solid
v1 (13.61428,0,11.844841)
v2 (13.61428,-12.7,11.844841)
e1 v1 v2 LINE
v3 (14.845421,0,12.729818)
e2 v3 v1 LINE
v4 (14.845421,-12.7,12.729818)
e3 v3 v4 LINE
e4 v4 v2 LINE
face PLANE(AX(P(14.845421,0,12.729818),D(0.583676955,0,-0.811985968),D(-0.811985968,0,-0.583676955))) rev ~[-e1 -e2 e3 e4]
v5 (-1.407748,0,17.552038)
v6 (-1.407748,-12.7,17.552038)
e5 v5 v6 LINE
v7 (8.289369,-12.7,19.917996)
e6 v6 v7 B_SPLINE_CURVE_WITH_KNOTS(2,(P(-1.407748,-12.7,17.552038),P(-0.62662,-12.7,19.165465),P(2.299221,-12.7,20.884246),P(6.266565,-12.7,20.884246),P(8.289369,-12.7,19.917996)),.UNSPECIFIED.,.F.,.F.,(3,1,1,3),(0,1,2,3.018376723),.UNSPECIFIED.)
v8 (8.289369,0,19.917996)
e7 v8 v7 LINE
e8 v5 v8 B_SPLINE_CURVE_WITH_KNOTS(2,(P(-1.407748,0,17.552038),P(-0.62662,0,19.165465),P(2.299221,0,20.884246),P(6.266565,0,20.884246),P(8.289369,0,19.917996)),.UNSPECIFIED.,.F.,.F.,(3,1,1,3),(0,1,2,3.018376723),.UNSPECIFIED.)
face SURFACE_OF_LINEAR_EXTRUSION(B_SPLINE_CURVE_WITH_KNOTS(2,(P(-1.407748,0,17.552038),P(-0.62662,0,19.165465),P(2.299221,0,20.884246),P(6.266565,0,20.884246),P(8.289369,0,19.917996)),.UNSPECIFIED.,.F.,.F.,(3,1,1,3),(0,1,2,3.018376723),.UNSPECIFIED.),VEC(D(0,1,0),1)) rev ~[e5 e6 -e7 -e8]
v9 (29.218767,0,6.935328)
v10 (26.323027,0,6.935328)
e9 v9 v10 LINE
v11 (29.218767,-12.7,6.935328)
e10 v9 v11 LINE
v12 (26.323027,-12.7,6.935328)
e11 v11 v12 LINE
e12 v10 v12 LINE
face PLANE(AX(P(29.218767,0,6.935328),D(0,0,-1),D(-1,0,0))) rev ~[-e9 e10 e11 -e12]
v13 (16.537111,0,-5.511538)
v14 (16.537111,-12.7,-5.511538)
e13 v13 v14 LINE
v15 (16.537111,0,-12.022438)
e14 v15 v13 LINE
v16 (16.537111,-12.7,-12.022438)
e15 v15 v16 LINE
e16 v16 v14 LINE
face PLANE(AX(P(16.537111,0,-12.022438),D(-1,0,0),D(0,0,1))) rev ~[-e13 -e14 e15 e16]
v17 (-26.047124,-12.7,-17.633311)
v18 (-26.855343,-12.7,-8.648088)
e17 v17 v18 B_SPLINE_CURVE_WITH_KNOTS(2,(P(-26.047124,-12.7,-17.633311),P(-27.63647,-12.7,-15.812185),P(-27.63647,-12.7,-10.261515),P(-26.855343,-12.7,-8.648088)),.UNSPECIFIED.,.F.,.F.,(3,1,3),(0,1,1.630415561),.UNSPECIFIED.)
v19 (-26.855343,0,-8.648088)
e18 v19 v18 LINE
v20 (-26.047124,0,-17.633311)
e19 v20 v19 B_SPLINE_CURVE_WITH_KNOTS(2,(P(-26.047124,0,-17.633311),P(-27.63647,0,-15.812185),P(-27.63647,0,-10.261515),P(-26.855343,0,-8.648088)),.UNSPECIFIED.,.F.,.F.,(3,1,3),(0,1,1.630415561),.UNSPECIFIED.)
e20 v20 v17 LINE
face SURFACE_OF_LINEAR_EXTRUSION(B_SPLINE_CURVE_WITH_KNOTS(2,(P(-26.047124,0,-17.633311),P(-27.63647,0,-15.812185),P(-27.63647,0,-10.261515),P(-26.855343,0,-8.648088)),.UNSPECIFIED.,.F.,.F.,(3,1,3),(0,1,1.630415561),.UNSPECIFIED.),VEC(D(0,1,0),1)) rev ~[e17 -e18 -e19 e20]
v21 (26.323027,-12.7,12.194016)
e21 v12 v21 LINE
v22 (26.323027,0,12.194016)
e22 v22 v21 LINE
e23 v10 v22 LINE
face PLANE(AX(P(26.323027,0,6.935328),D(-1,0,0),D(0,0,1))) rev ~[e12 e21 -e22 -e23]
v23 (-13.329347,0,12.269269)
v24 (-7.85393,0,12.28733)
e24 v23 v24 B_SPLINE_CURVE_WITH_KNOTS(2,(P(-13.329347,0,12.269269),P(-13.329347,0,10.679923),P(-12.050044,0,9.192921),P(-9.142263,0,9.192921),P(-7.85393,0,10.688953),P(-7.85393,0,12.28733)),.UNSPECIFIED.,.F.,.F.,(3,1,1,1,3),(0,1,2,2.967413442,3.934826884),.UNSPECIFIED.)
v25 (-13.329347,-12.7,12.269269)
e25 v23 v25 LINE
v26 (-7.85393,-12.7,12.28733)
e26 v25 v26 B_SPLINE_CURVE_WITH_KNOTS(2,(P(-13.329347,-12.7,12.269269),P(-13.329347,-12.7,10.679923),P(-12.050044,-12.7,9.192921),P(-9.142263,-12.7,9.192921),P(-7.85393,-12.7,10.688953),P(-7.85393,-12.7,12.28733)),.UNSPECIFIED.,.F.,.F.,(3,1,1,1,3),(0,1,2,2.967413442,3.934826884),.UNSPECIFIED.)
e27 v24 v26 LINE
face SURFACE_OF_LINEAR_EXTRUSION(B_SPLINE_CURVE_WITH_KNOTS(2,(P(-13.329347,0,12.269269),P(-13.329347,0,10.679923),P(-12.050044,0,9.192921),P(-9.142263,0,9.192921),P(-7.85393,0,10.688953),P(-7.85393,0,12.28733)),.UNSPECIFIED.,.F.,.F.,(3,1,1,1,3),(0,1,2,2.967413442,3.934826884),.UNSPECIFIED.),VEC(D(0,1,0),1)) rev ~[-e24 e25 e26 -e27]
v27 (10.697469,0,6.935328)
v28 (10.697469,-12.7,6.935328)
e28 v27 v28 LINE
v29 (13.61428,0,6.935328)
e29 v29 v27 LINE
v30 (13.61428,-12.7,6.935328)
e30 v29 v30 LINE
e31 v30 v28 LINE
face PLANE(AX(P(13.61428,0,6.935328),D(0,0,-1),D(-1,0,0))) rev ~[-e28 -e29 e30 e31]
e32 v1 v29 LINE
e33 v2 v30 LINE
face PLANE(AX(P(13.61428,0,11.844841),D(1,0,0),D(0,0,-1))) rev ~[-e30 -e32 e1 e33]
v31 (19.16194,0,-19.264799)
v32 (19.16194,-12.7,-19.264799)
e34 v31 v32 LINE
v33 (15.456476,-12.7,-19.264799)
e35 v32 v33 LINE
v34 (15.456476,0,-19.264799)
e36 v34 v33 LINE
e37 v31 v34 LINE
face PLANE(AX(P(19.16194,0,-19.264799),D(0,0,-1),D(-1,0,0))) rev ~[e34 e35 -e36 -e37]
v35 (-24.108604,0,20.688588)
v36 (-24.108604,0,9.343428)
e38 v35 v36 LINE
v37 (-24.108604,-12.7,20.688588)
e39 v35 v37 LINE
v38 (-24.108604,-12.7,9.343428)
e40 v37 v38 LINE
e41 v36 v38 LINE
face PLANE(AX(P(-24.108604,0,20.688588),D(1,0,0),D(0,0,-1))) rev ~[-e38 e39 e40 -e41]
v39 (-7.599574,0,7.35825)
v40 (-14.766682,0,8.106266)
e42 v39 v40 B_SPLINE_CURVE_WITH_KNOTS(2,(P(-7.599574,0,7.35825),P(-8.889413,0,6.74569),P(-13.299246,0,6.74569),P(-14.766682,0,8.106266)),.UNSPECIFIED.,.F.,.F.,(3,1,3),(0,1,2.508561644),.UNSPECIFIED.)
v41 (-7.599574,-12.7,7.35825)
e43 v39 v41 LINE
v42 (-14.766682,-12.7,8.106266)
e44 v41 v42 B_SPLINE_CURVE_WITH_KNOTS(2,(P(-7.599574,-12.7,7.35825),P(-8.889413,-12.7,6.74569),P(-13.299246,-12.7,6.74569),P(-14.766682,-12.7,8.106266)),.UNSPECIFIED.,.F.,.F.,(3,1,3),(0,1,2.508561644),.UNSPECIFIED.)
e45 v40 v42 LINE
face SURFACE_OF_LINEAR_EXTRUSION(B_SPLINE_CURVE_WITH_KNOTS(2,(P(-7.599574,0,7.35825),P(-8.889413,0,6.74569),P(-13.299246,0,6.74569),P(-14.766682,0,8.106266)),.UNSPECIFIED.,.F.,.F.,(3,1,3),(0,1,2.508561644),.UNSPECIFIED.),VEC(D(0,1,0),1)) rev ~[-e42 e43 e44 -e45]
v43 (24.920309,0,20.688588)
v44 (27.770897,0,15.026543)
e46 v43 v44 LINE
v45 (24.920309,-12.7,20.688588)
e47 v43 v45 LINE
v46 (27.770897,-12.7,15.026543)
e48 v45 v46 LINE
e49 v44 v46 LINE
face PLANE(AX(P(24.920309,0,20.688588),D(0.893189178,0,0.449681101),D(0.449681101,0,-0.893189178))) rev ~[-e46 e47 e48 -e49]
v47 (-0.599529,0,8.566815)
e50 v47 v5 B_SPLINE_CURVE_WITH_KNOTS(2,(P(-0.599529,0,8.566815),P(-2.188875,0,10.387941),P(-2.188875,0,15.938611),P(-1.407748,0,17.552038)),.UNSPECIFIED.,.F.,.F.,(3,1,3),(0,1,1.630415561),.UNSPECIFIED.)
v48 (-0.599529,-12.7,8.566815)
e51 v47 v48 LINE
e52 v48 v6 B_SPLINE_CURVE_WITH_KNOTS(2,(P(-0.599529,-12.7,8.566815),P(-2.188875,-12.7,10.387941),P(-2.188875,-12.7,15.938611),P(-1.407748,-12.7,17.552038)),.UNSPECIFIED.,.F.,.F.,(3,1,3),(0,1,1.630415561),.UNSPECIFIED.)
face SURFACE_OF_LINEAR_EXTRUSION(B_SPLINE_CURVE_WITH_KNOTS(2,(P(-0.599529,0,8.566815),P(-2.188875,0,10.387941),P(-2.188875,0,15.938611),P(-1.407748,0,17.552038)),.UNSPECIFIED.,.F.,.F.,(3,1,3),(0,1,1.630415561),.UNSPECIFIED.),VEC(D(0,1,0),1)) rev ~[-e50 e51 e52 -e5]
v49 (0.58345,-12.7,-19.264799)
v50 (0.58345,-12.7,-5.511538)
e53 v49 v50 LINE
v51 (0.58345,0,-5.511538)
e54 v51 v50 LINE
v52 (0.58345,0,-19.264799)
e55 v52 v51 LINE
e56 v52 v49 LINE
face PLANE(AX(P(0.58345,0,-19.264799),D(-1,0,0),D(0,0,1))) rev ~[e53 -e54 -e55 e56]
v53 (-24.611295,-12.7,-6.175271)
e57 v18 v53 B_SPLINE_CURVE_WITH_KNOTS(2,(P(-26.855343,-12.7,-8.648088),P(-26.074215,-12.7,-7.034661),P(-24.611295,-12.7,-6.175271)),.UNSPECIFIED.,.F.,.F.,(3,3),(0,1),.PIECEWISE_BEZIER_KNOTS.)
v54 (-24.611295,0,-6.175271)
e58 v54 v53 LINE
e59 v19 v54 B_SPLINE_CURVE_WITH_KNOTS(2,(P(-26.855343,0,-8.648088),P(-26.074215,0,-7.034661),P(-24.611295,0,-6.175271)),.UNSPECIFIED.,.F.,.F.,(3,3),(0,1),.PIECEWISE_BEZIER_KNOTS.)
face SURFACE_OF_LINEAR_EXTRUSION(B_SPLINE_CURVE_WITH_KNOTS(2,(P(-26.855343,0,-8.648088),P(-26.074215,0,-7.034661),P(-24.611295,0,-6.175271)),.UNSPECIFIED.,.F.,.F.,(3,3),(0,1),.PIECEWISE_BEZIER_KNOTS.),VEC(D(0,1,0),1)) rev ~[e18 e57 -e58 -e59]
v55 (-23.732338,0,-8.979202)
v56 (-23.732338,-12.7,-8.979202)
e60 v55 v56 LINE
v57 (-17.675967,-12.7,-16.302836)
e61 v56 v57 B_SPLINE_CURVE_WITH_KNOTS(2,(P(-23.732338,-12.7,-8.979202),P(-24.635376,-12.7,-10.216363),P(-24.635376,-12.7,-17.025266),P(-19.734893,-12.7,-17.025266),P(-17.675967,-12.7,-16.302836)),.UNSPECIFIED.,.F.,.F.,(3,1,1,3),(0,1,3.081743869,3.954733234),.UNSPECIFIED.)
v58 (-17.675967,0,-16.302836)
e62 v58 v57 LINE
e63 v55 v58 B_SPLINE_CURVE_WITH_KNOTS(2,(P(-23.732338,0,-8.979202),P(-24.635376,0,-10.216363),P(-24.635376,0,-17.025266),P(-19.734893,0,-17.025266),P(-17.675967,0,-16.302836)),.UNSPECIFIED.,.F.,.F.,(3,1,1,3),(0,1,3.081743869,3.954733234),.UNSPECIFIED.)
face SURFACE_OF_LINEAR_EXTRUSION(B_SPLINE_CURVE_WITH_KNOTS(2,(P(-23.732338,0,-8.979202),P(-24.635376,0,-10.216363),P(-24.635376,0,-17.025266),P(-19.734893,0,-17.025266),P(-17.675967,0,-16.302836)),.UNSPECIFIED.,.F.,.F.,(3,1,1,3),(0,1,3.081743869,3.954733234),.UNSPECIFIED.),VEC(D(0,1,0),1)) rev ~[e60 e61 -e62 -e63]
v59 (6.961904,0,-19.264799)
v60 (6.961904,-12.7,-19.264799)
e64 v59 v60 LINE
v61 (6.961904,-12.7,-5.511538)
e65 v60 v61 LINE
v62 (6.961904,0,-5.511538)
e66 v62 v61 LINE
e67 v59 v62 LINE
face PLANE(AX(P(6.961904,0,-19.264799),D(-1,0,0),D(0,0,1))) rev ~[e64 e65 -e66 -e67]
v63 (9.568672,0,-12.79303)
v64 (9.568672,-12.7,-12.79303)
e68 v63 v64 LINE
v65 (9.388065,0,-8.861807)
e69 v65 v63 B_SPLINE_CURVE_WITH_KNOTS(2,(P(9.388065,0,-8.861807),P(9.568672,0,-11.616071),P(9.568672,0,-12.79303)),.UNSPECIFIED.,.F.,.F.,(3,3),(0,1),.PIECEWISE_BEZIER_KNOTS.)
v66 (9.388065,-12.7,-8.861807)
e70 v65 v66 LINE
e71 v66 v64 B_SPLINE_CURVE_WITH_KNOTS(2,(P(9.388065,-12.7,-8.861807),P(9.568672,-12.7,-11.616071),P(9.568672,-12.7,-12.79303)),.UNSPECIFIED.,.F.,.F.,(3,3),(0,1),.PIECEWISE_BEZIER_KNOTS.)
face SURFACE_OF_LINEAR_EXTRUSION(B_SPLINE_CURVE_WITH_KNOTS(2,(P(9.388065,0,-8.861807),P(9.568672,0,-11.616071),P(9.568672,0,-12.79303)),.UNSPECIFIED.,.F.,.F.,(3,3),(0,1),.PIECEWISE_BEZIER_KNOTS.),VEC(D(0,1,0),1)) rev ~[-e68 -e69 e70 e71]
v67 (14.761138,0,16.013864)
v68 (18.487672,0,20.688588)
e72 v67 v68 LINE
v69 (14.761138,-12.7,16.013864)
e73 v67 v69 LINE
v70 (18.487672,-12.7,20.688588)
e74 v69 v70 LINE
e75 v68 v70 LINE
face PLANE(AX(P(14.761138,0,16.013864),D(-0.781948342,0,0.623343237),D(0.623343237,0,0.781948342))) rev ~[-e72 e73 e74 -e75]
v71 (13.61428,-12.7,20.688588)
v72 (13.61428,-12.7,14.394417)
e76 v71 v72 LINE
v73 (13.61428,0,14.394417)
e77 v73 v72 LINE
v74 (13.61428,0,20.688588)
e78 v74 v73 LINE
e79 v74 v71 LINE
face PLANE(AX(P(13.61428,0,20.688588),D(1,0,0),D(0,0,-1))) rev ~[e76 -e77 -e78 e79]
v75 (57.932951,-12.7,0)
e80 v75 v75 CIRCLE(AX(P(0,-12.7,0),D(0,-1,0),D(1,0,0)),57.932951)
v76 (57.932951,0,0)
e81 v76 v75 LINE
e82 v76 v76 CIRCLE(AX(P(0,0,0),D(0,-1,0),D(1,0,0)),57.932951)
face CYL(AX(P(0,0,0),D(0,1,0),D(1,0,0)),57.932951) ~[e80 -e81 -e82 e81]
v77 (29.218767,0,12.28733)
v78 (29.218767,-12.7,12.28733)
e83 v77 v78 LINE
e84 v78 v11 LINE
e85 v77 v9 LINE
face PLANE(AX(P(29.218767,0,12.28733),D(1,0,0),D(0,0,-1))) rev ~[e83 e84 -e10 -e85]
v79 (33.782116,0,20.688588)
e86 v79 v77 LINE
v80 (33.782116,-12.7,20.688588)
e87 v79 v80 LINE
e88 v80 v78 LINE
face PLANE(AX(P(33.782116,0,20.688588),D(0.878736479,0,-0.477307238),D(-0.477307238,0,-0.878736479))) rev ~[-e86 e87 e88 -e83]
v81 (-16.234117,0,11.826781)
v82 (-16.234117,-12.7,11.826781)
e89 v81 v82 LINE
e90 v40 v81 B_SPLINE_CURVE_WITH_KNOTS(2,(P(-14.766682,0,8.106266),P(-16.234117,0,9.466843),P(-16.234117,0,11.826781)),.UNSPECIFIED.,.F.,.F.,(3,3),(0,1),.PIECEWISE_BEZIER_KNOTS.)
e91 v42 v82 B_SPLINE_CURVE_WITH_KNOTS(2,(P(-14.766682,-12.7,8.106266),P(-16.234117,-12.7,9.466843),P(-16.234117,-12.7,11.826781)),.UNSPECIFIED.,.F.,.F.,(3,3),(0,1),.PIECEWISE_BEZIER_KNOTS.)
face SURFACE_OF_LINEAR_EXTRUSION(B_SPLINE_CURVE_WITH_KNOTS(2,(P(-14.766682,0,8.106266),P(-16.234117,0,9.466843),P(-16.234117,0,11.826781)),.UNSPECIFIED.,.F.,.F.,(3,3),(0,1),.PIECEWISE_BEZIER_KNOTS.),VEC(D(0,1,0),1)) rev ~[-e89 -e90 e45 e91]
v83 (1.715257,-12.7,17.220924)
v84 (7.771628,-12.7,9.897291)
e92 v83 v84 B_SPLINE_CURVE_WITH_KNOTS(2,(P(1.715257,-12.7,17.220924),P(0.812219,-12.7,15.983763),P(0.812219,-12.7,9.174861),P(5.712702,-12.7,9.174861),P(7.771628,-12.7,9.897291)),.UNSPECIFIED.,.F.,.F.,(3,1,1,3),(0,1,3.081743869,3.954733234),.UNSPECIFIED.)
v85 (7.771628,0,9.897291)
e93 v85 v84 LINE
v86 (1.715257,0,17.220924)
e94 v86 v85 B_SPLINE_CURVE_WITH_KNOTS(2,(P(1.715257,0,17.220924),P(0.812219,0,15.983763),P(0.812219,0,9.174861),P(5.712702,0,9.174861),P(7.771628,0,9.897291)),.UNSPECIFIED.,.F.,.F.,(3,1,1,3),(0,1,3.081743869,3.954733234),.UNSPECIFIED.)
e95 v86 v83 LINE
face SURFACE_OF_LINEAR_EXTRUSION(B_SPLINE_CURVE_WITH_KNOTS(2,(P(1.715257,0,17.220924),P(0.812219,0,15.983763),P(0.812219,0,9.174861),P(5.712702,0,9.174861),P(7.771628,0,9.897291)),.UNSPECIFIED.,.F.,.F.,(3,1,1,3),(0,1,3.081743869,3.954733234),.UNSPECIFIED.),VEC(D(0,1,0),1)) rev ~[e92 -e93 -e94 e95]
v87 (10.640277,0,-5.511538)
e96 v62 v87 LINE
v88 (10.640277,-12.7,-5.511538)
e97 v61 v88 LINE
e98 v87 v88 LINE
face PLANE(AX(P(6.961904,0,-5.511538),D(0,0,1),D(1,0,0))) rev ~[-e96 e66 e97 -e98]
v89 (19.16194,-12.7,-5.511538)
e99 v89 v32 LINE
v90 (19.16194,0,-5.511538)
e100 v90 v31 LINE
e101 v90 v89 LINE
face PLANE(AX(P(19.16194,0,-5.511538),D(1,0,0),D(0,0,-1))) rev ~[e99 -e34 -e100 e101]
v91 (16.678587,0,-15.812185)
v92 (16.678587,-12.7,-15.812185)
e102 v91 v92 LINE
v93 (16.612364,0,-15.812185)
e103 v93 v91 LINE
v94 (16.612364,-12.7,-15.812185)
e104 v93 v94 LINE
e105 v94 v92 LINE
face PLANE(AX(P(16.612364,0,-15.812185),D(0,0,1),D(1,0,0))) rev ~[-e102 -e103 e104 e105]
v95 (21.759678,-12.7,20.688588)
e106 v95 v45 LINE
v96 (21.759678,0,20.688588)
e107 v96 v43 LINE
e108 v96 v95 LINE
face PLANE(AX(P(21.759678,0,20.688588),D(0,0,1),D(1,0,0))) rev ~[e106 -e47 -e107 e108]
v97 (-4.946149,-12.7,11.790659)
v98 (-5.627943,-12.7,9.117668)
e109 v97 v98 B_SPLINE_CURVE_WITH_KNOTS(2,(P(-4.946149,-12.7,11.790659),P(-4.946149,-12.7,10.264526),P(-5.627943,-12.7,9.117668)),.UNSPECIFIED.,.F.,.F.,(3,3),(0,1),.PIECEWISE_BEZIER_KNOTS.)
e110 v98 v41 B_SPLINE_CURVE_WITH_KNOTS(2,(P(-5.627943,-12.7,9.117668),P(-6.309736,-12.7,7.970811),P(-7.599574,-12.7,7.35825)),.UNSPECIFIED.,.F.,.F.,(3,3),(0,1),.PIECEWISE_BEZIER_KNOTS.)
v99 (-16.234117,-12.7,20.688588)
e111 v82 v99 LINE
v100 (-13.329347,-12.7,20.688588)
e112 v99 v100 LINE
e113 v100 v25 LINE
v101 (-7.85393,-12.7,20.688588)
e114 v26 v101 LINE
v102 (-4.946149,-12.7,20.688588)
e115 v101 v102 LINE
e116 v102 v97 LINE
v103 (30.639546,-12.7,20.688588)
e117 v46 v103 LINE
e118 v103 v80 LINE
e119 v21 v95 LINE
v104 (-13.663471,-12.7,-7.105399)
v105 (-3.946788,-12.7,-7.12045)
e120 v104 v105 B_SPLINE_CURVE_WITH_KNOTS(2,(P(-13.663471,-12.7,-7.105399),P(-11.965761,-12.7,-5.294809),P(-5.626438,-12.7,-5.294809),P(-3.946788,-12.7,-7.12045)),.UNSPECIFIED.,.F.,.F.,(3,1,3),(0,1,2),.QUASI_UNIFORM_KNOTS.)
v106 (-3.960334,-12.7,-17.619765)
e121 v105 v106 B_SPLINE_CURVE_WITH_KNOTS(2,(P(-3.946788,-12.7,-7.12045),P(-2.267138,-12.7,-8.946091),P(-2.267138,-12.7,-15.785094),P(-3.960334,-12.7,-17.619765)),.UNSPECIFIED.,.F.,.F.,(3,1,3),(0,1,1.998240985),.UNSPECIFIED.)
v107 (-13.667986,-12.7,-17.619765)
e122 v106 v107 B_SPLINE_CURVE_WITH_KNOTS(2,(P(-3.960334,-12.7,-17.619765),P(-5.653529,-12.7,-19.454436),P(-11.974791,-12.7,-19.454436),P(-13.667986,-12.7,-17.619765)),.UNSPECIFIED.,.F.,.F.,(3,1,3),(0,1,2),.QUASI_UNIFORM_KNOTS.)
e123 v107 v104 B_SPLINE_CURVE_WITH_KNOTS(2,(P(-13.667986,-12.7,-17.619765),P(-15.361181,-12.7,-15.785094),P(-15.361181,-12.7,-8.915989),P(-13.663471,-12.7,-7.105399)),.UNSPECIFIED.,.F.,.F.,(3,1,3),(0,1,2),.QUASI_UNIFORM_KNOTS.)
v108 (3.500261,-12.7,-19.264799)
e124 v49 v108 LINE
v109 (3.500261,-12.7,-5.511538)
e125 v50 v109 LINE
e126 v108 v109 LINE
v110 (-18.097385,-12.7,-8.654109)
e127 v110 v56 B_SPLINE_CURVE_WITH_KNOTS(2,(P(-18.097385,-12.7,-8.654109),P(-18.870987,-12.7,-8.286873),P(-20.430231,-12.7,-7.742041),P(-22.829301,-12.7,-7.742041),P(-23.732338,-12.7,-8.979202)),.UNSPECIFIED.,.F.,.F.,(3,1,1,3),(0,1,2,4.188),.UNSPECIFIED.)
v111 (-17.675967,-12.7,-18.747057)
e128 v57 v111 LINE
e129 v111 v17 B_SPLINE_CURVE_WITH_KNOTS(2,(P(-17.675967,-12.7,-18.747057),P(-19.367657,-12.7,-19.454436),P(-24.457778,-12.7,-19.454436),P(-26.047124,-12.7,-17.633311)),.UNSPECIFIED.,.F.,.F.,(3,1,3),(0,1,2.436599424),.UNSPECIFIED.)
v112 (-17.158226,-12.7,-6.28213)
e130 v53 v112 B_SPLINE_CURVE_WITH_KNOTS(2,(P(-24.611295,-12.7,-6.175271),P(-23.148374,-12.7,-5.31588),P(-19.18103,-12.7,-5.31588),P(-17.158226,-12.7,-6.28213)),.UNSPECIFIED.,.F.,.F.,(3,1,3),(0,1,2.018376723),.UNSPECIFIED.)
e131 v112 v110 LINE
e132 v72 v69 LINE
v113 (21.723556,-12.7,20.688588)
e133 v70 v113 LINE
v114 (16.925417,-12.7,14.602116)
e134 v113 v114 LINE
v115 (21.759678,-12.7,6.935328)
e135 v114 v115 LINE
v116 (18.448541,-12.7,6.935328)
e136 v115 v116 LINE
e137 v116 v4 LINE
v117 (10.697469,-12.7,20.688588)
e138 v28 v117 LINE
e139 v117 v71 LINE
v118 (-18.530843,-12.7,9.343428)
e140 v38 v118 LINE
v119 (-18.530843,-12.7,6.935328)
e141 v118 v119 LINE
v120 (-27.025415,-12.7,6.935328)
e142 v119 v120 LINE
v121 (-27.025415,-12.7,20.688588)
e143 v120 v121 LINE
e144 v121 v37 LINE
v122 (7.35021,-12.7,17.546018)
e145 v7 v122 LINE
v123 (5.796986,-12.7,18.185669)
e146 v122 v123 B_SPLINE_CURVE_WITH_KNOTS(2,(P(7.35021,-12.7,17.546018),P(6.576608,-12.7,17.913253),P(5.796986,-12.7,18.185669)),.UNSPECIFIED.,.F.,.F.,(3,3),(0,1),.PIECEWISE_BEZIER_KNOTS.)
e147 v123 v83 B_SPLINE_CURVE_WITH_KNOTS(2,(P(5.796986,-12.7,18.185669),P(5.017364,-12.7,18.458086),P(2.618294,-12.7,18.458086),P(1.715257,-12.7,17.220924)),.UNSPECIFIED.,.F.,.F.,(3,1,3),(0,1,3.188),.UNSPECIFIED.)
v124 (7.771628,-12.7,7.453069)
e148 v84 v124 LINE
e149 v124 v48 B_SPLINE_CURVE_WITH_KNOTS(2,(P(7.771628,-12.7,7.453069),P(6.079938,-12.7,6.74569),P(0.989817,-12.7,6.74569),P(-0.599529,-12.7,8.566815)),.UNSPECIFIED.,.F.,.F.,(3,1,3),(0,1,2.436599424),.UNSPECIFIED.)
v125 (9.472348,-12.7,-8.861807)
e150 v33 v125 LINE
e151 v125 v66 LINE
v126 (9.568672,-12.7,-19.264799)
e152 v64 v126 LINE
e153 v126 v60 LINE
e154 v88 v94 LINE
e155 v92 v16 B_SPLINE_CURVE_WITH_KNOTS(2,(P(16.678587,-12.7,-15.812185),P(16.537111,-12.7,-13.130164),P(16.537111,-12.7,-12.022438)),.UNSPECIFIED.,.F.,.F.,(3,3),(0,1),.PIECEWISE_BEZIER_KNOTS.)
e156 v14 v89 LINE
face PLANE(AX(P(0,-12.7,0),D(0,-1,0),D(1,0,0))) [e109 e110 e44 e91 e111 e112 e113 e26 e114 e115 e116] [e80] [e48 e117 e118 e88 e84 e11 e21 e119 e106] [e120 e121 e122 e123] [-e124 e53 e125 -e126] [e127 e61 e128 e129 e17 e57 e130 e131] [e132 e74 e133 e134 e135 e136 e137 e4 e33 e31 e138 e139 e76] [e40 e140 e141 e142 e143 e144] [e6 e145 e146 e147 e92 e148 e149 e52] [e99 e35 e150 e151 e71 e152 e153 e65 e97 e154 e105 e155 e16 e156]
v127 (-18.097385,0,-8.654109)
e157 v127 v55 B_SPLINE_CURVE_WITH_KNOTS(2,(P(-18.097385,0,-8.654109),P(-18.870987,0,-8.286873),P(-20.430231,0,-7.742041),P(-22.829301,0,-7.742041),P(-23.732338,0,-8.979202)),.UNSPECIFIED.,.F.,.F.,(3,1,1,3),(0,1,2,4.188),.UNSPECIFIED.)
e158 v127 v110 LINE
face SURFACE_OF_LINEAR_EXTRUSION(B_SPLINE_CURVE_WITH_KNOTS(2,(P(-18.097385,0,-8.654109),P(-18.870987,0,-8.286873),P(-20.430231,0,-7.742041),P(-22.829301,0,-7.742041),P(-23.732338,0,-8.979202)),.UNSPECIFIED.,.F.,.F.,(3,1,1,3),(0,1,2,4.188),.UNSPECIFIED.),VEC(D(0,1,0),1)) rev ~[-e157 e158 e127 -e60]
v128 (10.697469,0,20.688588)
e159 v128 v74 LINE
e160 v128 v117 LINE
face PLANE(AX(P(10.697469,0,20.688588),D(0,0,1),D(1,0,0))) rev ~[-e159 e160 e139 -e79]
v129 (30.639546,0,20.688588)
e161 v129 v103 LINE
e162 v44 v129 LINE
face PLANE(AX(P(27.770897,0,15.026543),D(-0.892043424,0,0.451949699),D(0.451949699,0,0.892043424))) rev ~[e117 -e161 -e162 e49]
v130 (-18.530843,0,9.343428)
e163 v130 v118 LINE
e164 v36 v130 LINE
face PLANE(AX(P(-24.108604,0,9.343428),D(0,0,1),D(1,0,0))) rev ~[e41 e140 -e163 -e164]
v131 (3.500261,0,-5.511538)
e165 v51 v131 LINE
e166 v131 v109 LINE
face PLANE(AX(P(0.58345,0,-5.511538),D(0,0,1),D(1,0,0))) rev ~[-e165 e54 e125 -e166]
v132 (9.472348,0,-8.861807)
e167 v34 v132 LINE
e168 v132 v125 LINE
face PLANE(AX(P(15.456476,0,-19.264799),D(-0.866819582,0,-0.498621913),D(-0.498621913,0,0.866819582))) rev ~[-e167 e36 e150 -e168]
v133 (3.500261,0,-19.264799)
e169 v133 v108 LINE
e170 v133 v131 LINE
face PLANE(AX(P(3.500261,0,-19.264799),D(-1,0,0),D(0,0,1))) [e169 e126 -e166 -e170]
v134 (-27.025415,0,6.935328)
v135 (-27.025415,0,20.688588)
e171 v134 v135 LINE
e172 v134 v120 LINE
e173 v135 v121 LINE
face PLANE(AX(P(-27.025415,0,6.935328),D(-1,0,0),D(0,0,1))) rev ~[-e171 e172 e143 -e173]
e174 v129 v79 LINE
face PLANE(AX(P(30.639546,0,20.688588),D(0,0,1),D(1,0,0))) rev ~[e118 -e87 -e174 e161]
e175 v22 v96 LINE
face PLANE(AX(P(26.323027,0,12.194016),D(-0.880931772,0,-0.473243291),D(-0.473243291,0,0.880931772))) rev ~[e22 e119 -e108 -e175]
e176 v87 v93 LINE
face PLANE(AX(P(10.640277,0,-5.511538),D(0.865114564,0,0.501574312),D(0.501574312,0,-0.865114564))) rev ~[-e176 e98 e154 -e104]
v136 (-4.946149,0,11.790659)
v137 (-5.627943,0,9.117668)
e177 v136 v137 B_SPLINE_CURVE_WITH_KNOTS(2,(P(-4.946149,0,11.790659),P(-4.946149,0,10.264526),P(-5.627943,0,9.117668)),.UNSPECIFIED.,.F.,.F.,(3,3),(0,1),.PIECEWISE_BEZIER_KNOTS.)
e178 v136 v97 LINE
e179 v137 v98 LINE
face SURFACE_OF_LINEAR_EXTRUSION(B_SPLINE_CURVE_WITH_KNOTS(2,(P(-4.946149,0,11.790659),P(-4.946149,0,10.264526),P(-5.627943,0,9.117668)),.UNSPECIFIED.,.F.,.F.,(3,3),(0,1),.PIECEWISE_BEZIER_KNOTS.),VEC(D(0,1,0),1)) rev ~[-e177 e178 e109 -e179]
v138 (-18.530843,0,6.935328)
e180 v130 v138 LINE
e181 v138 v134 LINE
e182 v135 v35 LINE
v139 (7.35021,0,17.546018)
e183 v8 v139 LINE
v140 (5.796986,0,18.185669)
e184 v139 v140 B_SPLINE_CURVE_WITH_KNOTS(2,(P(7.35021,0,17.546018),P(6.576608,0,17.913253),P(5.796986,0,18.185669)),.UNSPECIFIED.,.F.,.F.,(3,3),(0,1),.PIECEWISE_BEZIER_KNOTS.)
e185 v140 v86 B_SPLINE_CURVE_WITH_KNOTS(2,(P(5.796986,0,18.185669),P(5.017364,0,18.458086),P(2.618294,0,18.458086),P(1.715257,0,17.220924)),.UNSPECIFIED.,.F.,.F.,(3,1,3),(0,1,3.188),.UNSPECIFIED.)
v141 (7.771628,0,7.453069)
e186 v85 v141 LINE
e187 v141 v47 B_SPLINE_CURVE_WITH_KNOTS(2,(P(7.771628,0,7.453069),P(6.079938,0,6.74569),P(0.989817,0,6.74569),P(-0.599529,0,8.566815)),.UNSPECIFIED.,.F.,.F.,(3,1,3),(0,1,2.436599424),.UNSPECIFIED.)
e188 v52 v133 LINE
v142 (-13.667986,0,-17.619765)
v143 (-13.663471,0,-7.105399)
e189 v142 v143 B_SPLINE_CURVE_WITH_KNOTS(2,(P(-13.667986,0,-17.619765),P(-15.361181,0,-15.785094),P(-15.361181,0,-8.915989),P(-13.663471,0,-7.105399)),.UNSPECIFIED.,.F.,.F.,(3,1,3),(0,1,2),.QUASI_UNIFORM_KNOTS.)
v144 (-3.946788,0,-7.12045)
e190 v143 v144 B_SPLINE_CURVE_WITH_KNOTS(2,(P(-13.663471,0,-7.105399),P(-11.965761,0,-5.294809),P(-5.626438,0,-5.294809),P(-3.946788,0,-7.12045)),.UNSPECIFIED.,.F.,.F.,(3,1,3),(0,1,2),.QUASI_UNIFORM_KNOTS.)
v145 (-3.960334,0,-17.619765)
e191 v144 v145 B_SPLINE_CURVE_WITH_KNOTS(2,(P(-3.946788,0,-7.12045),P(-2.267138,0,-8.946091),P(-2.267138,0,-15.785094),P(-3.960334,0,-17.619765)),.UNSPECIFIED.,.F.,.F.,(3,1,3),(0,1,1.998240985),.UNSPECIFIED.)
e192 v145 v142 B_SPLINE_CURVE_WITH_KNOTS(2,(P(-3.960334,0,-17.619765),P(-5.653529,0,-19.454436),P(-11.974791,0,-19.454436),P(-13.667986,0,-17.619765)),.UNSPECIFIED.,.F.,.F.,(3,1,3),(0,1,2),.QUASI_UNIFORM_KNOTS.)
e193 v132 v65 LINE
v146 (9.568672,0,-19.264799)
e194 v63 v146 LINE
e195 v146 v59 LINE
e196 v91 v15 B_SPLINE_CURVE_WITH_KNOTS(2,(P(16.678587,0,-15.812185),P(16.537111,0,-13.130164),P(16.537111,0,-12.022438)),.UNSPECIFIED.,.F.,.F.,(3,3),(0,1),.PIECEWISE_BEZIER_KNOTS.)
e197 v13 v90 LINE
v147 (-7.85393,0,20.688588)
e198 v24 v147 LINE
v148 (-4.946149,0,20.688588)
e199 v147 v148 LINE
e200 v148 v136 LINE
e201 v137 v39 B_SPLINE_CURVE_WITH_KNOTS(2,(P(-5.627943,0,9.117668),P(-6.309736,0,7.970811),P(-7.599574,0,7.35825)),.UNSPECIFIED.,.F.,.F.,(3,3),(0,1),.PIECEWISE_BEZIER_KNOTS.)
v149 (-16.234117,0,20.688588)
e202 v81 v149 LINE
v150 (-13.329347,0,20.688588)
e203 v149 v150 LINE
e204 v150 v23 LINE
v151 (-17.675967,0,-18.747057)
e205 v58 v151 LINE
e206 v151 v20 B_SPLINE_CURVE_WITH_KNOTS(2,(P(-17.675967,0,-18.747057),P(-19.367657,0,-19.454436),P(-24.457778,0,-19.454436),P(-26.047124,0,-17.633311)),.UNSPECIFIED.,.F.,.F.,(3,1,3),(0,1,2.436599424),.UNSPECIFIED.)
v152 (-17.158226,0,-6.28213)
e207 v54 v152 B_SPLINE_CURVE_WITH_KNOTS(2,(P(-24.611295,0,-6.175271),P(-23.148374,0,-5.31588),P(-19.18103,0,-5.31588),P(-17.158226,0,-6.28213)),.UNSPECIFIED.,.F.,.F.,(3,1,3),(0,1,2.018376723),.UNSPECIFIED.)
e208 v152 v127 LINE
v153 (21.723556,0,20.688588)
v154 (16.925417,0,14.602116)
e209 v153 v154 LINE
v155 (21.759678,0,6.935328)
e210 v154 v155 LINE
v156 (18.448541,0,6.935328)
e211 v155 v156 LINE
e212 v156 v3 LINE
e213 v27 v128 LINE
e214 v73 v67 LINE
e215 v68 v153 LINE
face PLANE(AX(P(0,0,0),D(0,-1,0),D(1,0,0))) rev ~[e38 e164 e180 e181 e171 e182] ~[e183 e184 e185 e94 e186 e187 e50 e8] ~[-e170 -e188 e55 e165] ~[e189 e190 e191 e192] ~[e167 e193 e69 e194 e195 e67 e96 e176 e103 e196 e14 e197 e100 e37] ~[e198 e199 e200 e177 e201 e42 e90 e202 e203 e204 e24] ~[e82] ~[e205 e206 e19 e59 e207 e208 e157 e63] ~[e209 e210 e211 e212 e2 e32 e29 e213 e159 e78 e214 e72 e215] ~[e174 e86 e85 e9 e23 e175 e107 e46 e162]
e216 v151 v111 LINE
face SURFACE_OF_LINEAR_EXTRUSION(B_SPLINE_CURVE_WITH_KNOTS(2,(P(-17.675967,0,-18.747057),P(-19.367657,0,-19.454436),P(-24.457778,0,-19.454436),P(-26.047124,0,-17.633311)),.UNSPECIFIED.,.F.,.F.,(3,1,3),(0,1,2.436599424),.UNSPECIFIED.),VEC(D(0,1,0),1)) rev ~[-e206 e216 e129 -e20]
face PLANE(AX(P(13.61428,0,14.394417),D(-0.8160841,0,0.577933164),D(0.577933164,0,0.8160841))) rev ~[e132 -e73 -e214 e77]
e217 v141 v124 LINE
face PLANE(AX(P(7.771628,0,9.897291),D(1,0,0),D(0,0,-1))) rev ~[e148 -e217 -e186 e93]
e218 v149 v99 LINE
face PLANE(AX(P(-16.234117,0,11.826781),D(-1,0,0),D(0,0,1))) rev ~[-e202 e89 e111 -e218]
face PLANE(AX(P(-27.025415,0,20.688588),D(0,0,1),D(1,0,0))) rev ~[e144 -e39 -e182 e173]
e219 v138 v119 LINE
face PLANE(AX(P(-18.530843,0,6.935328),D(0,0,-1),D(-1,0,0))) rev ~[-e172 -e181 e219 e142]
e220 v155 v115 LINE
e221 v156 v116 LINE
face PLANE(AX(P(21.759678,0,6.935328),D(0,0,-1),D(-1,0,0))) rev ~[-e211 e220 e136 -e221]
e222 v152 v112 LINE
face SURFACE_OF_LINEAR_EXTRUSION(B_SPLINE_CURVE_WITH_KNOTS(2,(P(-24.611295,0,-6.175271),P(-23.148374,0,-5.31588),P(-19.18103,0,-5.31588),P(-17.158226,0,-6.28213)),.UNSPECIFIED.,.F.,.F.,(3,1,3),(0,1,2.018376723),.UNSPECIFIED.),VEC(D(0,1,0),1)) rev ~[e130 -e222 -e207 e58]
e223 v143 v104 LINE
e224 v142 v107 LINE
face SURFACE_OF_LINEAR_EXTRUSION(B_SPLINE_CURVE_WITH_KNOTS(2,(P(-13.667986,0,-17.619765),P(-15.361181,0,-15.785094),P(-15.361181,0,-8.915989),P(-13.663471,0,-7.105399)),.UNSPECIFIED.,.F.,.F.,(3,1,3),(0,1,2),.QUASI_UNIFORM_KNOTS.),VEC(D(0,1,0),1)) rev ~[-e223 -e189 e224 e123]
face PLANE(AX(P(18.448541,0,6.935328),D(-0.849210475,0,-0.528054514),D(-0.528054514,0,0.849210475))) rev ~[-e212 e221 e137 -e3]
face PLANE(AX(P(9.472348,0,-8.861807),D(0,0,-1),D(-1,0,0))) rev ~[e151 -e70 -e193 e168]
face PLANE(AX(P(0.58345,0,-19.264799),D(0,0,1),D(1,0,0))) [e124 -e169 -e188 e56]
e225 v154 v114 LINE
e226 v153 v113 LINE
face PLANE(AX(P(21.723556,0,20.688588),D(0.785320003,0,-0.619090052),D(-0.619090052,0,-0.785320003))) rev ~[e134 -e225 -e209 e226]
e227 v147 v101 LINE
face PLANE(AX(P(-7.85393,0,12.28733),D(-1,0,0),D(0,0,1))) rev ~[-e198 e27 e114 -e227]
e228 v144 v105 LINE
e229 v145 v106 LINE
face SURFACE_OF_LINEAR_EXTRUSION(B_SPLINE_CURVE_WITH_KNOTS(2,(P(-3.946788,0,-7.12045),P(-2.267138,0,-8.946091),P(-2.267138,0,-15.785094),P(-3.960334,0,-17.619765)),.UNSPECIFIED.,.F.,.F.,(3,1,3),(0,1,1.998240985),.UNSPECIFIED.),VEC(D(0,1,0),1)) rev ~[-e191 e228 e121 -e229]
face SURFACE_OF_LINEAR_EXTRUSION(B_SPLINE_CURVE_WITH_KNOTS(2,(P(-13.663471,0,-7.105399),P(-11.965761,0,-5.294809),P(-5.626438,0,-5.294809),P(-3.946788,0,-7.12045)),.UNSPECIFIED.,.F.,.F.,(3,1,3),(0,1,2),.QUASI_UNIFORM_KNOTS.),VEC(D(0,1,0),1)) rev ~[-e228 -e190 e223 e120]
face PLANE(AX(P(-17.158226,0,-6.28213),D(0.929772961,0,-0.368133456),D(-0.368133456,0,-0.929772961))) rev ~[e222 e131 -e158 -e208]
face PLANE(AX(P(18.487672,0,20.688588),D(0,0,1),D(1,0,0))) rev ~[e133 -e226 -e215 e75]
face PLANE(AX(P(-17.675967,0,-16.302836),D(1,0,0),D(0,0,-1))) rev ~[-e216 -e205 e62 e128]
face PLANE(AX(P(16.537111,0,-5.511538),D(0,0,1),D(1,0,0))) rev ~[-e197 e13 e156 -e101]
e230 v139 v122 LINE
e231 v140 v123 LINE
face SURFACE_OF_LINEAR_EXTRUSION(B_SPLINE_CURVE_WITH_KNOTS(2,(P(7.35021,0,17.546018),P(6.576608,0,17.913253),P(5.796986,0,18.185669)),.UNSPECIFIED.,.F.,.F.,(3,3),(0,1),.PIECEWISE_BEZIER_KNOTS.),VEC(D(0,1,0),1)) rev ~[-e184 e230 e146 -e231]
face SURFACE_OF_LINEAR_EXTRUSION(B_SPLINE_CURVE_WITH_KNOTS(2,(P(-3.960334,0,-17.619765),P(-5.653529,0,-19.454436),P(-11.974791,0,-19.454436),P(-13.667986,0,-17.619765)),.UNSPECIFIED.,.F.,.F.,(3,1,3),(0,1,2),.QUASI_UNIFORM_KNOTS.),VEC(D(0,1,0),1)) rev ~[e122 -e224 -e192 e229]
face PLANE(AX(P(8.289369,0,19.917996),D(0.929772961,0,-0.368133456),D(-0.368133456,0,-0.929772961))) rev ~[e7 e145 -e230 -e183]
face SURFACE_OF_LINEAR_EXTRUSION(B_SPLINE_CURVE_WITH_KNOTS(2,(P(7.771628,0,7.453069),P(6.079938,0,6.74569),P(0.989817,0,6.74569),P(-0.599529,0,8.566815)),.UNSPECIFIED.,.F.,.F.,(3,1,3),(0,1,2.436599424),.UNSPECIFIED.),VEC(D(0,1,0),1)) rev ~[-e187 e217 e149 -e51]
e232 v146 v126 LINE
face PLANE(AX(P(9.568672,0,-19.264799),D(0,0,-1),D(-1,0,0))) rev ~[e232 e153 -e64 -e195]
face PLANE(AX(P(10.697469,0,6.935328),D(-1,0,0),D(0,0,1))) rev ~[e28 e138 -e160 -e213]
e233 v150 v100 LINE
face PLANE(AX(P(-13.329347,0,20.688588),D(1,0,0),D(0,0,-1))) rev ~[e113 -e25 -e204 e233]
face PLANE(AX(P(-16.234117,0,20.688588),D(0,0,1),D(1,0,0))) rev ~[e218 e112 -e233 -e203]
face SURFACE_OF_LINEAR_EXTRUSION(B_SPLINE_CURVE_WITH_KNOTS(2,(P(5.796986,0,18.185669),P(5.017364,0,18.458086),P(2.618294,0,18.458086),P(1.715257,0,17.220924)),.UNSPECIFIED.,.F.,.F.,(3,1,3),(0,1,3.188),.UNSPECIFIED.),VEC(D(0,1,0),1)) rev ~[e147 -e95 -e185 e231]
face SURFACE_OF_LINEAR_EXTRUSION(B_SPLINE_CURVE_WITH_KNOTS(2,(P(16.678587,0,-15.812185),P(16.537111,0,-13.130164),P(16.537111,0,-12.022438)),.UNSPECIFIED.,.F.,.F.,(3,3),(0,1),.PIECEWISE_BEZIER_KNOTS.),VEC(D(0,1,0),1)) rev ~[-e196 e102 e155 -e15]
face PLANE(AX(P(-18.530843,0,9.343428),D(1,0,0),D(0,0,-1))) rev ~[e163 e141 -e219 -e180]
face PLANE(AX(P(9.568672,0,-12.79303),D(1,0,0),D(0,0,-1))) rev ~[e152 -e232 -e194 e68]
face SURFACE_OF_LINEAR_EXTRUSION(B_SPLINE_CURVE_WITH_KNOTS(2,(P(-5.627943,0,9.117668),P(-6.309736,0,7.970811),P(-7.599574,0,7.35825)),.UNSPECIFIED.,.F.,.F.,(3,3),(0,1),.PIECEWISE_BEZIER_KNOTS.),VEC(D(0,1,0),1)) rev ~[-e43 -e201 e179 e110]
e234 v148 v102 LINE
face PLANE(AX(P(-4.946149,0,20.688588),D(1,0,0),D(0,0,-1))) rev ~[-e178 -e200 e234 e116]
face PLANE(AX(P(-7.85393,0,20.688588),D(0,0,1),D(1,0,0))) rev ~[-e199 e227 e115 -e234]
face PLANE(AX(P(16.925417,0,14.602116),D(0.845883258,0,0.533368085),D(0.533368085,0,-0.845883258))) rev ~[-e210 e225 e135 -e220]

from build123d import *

# Parameters (mm, degrees)
F0_R     = 57.932951026
F0_W     = 2.9168109343
F0_H     = 13.753260226
F1_DEPTH = 12.7


with BuildPart() as f1:
    # F0 (on Front) → F1 (new body)
    with BuildSketch(Plane.XZ):
        Circle(F0_R)
        with BuildLine():
            add(Edge.make_bspline(
                [(-19.6506091277, -8.0144570558), (-20.4302314517, -7.7420407611), (-21.1827626525, -7.7420407611)],
                knots=[0, 0, 0, 1, 1, 1], degree=2))
            add(Edge.make_bspline(
                [(-21.1827626525, -7.7420407611), (-22.8293009199, -7.7420407611), (-23.7323383609, -8.9792020552)],
                knots=[0, 0, 0, 1, 1, 1], degree=2))
            add(Edge.make_bspline(
                [(-23.7323383609, -8.9792020552), (-24.6353758019, -10.2163633494), (-24.6353758019, -12.425794955)],
                knots=[0, 0, 0, 1, 1, 1], degree=2))
            add(Edge.make_bspline(
                [(-24.6353758019, -12.425794955), (-24.6353758019, -17.0252656543), (-21.1827626525, -17.0252656543)],
                knots=[0, 0, 0, 1, 1, 1], degree=2))
            add(Edge.make_bspline(
                [(-21.1827626525, -17.0252656543), (-19.7348926222, -17.0252656543), (-17.6759672568, -16.3028357015)],
                knots=[0, 0, 0, 1, 1, 1], degree=2))
            Line((-17.6759672568, -16.3028357015), (-17.6759672568, -18.7470570418))
            add(Edge.make_bspline(
                [(-17.6759672568, -18.7470570418), (-19.3676573962, -19.4544363705), (-21.4566840096, -19.4544363705)],
                knots=[0, 0, 0, 1, 1, 1], degree=2))
            add(Edge.make_bspline(
                [(-21.4566840096, -19.4544363705), (-24.4577784385, -19.4544363705), (-26.0471243346, -17.6333108646)],
                knots=[0, 0, 0, 1, 1, 1], degree=2))
            add(Edge.make_bspline(
                [(-26.0471243346, -17.6333108646), (-27.6364702307, -15.8121853586), (-27.6364702307, -12.4077342061)],
                knots=[0, 0, 0, 1, 1, 1], degree=2))
            add(Edge.make_bspline(
                [(-27.6364702307, -12.4077342061), (-27.6364702307, -10.2615152214), (-26.8553428443, -8.6480883269)],
                knots=[0, 0, 0, 1, 1, 1], degree=2))
            add(Edge.make_bspline(
                [(-26.8553428443, -8.6480883269), (-26.0742154578, -7.0346614323), (-24.6112948034, -6.175270801)],
                knots=[0, 0, 0, 1, 1, 1], degree=2))
            add(Edge.make_bspline(
                [(-24.6112948034, -6.175270801), (-23.1483741491, -5.3158801697), (-21.1827626525, -5.3158801697)],
                knots=[0, 0, 0, 1, 1, 1], degree=2))
            add(Edge.make_bspline(
                [(-21.1827626525, -5.3158801697), (-19.1810296584, -5.3158801697), (-17.1582257906, -6.2821302315)],
                knots=[0, 0, 0, 1, 1, 1], degree=2))
            Line((-17.1582257906, -6.2821302315), (-18.0973847292, -8.6541085765))
            add(Edge.make_bspline(
                [(-18.0973847292, -8.6541085765), (-18.8709868037, -8.2868733505), (-19.6506091277, -8.0144570558)],
                knots=[0, 0, 0, 1, 1, 1], degree=2))
        make_face(mode=Mode.SUBTRACT)
        with BuildLine():
            add(Edge.make_bspline(
                [(-3.9467880292, -7.1204499892), (-2.267138389, -8.9460906824), (-2.267138389, -12.3686025837)],
                knots=[0, 0, 0, 1, 1, 1], degree=2))
            add(Edge.make_bspline(
                [(-2.267138389, -12.3686025837), (-2.267138389, -15.7850942354), (-3.9603335908, -17.619765303)],
                knots=[0, 0, 0, 1, 1, 1], degree=2))
            add(Edge.make_bspline(
                [(-3.9603335908, -17.619765303), (-5.6535287926, -19.4544363705), (-8.814159836, -19.4544363705)],
                knots=[0, 0, 0, 1, 1, 1], degree=2))
            add(Edge.make_bspline(
                [(-8.814159836, -19.4544363705), (-11.9747908794, -19.4544363705), (-13.6679860812, -17.619765303)],
                knots=[0, 0, 0, 1, 1, 1], degree=2))
            add(Edge.make_bspline(
                [(-13.6679860812, -17.619765303), (-15.3611812831, -15.7850942354), (-15.3611812831, -12.3505418349)],
                knots=[0, 0, 0, 1, 1, 1], degree=2))
            add(Edge.make_bspline(
                [(-15.3611812831, -12.3505418349), (-15.3611812831, -8.9159894344), (-13.663470894, -7.1053993652)],
                knots=[0, 0, 0, 1, 1, 1], degree=2))
            add(Edge.make_bspline(
                [(-13.663470894, -7.1053993652), (-11.965760505, -5.2948092961), (-8.7960990872, -5.2948092961)],
                knots=[0, 0, 0, 1, 1, 1], degree=2))
            add(Edge.make_bspline(
                [(-8.7960990872, -5.2948092961), (-5.6264376694, -5.2948092961), (-3.9467880292, -7.1204499892)],
                knots=[0, 0, 0, 1, 1, 1], degree=2))
        make_face(mode=Mode.SUBTRACT)
        with Locations((2.0418552669, -12.3881683949)):
            Rectangle(F0_W, F0_H, mode=Mode.SUBTRACT)
        with BuildLine():
            Line((19.1619400853, -5.5115382819), (19.1619400853, -19.2647985079))
            Line((19.1619400853, -19.2647985079), (15.4564764525, -19.2647985079))
            Line((15.4564764525, -19.2647985079), (9.4723483437, -8.8618071879))
            Line((9.4723483437, -8.8618071879), (9.3880648492, -8.8618071879))
            add(Edge.make_bspline(
                [(9.3880648492, -8.8618071879), (9.5686723374, -11.6160713829), (9.5686723374, -12.793030181)],
                knots=[0, 0, 0, 1, 1, 1], degree=2))
            Line((9.5686723374, -12.793030181), (9.5686723374, -19.2647985079))
            Line((9.5686723374, -19.2647985079), (6.9619042578, -19.2647985079))
            Line((6.9619042578, -19.2647985079), (6.9619042578, -5.5115382819))
            Line((6.9619042578, -5.5115382819), (10.6402767673, -5.5115382819))
            Line((10.6402767673, -5.5115382819), (16.612364377, -15.8121853586))
            Line((16.612364377, -15.8121853586), (16.6785871226, -15.8121853586))
            add(Edge.make_bspline(
                [(16.6785871226, -15.8121853586), (16.5371112569, -13.1301641589), (16.5371112569, -12.0224382313)],
                knots=[0, 0, 0, 1, 1, 1], degree=2))
            Line((16.5371112569, -12.0224382313), (16.5371112569, -5.5115382819))
            Line((16.5371112569, -5.5115382819), (19.1619400853, -5.5115382819))
        make_face(mode=Mode.SUBTRACT)
        Polygon((-18.5308427009, 6.9353277795), (-27.0254148956, 6.9353277795), (-27.0254148956, 20.6885880055), (-24.1086039613, 20.6885880055), (-24.1086039613, 9.3434276221), (-18.5308427009, 9.3434276221), align=None, mode=Mode.SUBTRACT)
        with BuildLine():
            Line((-7.8539300238, 20.6885880055), (-4.9461494639, 20.6885880055))
            Line((-4.9461494639, 20.6885880055), (-4.9461494639, 11.7906590871))
            add(Edge.make_bspline(
                [(-4.9461494639, 11.7906590871), (-4.9461494639, 10.2645258119), (-5.6279427318, 9.1176682619)],
                knots=[0, 0, 0, 1, 1, 1], degree=2))
            add(Edge.make_bspline(
                [(-5.6279427318, 9.1176682619), (-6.3097359997, 7.9708107118), (-7.5995744779, 7.3582503144)],
                knots=[0, 0, 0, 1, 1, 1], degree=2))
            add(Edge.make_bspline(
                [(-7.5995744779, 7.3582503144), (-8.8894129561, 6.7456899169), (-10.6473258412, 6.7456899169)],
                knots=[0, 0, 0, 1, 1, 1], degree=2))
            add(Edge.make_bspline(
                [(-10.6473258412, 6.7456899169), (-13.2992457928, 6.7456899169), (-14.7666816344, 8.106266328)],
                knots=[0, 0, 0, 1, 1, 1], degree=2))
            add(Edge.make_bspline(
                [(-14.7666816344, 8.106266328), (-16.234117476, 9.466842739), (-16.234117476, 11.8267805848)],
                knots=[0, 0, 0, 1, 1, 1], degree=2))
            Line((-16.234117476, 11.8267805848), (-16.234117476, 20.6885880055))
            Line((-16.234117476, 20.6885880055), (-13.3293470409, 20.6885880055))
            Line((-13.3293470409, 20.6885880055), (-13.3293470409, 12.2692689308))
            add(Edge.make_bspline(
                [(-13.3293470409, 12.2692689308), (-13.3293470409, 10.6799230347), (-12.6896955202, 9.9364222083)],
                knots=[0, 0, 0, 1, 1, 1], degree=2))
            add(Edge.make_bspline(
                [(-12.6896955202, 9.9364222083), (-12.0500439995, 9.1929213819), (-10.5720727211, 9.1929213819)],
                knots=[0, 0, 0, 1, 1, 1], degree=2))
            add(Edge.make_bspline(
                [(-10.5720727211, 9.1929213819), (-9.1422634396, 9.1929213819), (-8.4980967317, 9.9409373955)],
                knots=[0, 0, 0, 1, 1, 1], degree=2))
            add(Edge.make_bspline(
                [(-8.4980967317, 9.9409373955), (-7.8539300238, 10.6889534091), (-7.8539300238, 12.2873296797)],
                knots=[0, 0, 0, 1, 1, 1], degree=2))
            Line((-7.8539300238, 12.2873296797), (-7.8539300238, 20.6885880055))
        make_face(mode=Mode.SUBTRACT)
        with BuildLine():
            add(Edge.make_bspline(
                [(5.7969859589, 18.1856692316), (5.0173636349, 18.4580855263), (4.2648324341, 18.4580855263)],
                knots=[0, 0, 0, 1, 1, 1], degree=2))
            add(Edge.make_bspline(
                [(4.2648324341, 18.4580855263), (2.6182941667, 18.4580855263), (1.7152567257, 17.2209242322)],
                knots=[0, 0, 0, 1, 1, 1], degree=2))
            add(Edge.make_bspline(
                [(1.7152567257, 17.2209242322), (0.8122192848, 15.983762938), (0.8122192848, 13.7743313325)],
                knots=[0, 0, 0, 1, 1, 1], degree=2))
            add(Edge.make_bspline(
                [(0.8122192848, 13.7743313325), (0.8122192848, 9.1748606331), (4.2648324341, 9.1748606331)],
                knots=[0, 0, 0, 1, 1, 1], degree=2))
            add(Edge.make_bspline(
                [(4.2648324341, 9.1748606331), (5.7127024644, 9.1748606331), (7.7716278298, 9.8972905859)],
                knots=[0, 0, 0, 1, 1, 1], degree=2))
            Line((7.7716278298, 9.8972905859), (7.7716278298, 7.4530692457))
            add(Edge.make_bspline(
                [(7.7716278298, 7.4530692457), (6.0799376904, 6.7456899169), (3.990911077, 6.7456899169)],
                knots=[0, 0, 0, 1, 1, 1], degree=2))
            add(Edge.make_bspline(
                [(3.990911077, 6.7456899169), (0.9898166481, 6.7456899169), (-0.599529248, 8.5668154229)],
                knots=[0, 0, 0, 1, 1, 1], degree=2))
            add(Edge.make_bspline(
                [(-0.599529248, 8.5668154229), (-2.1888751441, 10.3879409288), (-2.1888751441, 13.7923920813)],
                knots=[0, 0, 0, 1, 1, 1], degree=2))
            add(Edge.make_bspline(
                [(-2.1888751441, 13.7923920813), (-2.1888751441, 15.938611066), (-1.4077477576, 17.5520379605)],
                knots=[0, 0, 0, 1, 1, 1], degree=2))
            add(Edge.make_bspline(
                [(-1.4077477576, 17.5520379605), (-0.6266203712, 19.1654648551), (0.8363002832, 20.0248554864)],
                knots=[0, 0, 0, 1, 1, 1], degree=2))
            add(Edge.make_bspline(
                [(0.8363002832, 20.0248554864), (2.2992209376, 20.8842461177), (4.2648324341, 20.8842461177)],
                knots=[0, 0, 0, 1, 1, 1], degree=2))
            add(Edge.make_bspline(
                [(4.2648324341, 20.8842461177), (6.2665654282, 20.8842461177), (8.289369296, 19.9179960559)],
                knots=[0, 0, 0, 1, 1, 1], degree=2))
            Line((8.289369296, 19.9179960559), (7.3502103574, 17.5460177109))
            add(Edge.make_bspline(
                [(7.3502103574, 17.5460177109), (6.576608283, 17.9132529369), (5.7969859589, 18.1856692316)],
                knots=[0, 0, 0, 1, 1, 1], degree=2))
        make_face(mode=Mode.SUBTRACT)
        Polygon((16.9254173565, 14.6021156534), (21.7596777905, 6.9353277795), (18.448540507, 6.9353277795), (14.8454211175, 12.7298180257), (13.6142800729, 11.8448413336), (13.6142800729, 6.9353277795), (10.6974691386, 6.9353277795), (10.6974691386, 20.6885880055), (13.6142800729, 20.6885880055), (13.6142800729, 14.3944170419), (14.761137623, 16.0138641861), (18.4876721294, 20.6885880055), (21.7235562929, 20.6885880055), align=None, mode=Mode.SUBTRACT)
        Polygon((24.9203088339, 20.6885880055), (27.7708970226, 15.0265432506), (30.6395459601, 20.6885880055), (33.7821162547, 20.6885880055), (29.218767053, 12.2873296797), (29.218767053, 6.9353277795), (26.3230269922, 6.9353277795), (26.3230269922, 12.1940158108), (21.7596777905, 20.6885880055), align=None, mode=Mode.SUBTRACT)
    extrude(amount=F1_DEPTH)


solid = f1.part
